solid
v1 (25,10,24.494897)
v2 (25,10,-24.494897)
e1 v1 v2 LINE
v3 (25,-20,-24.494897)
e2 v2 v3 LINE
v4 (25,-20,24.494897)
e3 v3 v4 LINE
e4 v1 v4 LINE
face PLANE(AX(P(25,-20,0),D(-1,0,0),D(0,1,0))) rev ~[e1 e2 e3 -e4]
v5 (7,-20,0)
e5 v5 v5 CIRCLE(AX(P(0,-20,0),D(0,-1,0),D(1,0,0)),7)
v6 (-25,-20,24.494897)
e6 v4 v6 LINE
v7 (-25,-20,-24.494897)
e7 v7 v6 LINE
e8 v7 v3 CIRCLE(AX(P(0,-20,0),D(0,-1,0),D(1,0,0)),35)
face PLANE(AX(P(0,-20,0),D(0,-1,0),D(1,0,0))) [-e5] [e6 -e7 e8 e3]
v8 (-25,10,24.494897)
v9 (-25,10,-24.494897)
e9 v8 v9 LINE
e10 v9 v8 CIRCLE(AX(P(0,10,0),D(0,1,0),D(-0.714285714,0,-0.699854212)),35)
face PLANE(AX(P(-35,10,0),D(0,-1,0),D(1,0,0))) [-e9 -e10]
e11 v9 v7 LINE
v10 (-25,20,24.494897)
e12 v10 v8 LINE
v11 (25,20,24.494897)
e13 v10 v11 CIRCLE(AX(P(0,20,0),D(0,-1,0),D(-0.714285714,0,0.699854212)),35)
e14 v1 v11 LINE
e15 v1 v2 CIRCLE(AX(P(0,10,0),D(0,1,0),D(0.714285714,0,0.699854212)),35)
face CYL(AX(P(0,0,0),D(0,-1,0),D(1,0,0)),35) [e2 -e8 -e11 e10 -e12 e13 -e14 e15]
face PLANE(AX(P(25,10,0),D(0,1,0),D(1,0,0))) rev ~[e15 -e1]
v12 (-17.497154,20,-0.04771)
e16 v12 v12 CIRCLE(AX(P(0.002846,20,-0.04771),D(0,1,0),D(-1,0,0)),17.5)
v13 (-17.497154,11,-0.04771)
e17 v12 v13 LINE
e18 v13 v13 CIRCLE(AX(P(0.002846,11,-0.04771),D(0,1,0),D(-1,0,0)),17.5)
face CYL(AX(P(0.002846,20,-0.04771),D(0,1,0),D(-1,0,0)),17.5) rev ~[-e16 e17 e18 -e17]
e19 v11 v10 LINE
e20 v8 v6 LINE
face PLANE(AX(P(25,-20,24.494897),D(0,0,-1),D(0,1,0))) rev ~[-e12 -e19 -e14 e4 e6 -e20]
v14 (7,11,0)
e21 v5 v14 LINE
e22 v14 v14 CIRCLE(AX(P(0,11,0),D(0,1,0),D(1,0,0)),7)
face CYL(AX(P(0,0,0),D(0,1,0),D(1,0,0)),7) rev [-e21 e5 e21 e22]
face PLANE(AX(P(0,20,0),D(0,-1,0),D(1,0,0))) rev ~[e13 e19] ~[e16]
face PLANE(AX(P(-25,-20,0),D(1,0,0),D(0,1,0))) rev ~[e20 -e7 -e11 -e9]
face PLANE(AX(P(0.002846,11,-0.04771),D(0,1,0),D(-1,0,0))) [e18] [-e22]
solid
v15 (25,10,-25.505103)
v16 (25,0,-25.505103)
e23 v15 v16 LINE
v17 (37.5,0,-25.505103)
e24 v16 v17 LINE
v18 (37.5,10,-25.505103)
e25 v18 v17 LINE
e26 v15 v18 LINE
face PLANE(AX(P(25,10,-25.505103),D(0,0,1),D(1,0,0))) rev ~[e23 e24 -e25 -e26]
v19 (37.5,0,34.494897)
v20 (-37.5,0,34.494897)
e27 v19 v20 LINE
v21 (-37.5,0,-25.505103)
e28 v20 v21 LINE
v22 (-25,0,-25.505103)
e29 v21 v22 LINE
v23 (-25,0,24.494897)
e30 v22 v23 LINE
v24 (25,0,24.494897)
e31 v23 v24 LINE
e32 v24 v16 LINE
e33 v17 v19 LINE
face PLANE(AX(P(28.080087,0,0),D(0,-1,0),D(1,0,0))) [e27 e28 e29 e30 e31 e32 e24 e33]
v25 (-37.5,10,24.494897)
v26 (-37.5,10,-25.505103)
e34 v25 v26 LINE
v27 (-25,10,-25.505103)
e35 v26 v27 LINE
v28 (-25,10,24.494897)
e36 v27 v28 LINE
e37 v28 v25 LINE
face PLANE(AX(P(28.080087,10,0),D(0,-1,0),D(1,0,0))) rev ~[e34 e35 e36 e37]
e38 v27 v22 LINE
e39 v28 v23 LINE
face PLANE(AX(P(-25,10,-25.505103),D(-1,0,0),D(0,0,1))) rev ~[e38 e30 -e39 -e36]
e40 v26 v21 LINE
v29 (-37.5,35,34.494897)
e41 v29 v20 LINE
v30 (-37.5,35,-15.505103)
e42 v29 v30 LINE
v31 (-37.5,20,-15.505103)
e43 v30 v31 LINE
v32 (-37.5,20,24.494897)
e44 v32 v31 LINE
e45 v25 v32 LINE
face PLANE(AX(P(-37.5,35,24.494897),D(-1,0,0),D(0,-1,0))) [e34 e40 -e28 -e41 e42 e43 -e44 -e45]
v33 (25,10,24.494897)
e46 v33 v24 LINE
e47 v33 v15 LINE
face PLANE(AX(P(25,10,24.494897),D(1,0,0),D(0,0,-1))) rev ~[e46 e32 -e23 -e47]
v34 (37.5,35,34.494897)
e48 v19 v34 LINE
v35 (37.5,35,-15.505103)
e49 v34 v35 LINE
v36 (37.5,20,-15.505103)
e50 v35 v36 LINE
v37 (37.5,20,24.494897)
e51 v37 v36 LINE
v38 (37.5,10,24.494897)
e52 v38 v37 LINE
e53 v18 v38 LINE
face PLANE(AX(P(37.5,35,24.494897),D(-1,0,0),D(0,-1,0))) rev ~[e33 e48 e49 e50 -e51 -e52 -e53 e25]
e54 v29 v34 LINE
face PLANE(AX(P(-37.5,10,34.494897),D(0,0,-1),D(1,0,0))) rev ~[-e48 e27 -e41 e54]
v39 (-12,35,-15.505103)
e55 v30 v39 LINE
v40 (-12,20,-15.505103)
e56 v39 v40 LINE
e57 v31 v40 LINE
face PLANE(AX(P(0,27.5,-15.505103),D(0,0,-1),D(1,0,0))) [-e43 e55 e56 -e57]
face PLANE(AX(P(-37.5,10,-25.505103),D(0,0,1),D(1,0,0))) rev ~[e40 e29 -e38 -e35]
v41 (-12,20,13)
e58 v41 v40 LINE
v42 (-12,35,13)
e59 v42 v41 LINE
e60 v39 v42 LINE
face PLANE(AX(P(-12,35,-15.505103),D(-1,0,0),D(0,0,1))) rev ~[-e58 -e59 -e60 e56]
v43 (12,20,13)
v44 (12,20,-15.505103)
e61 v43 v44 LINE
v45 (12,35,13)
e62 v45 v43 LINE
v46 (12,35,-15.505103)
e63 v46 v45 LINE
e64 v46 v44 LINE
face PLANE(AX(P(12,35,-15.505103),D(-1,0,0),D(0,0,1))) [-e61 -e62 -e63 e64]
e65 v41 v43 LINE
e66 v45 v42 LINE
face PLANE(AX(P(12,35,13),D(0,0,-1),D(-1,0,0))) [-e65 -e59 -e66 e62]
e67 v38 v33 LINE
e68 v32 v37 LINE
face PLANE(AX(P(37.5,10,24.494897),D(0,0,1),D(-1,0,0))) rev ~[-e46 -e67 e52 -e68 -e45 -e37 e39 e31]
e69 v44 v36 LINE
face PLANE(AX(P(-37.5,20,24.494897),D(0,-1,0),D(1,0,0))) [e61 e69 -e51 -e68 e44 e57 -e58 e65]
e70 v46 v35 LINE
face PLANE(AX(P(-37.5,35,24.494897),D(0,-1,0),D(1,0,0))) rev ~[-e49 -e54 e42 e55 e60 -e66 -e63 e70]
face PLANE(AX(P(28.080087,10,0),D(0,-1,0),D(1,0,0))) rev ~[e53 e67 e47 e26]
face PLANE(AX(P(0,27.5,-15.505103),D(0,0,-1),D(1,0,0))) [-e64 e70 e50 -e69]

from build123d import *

# Parameters (mm, degrees)
F0_R      = 35
F0_R_2    = 7
F1_DEPTH  = 20
F2_W      = 10
F2_H      = 30
F3_DEPTH  = 35
F5_DEPTH  = 70
F6_R      = 17.5
F6_R_2    = 7
F7_DEPTH  = 9
F9_DEPTH  = 10
F11_DEPTH = 25
F12_W     = 75
F12_H     = 15
F13_DEPTH = 40
F14_W     = 24
F14_H     = 28.5051025722
F15_DEPTH = 25


# Not quite as in the source:
# - a feature names something its author has since deleted; it is built from what else it names


with BuildPart() as f1:
    # F0 (on Front) → F1 (new body, symmetric)
    with BuildSketch(Plane.XZ):
        Circle(F0_R)
        Circle(F0_R_2, mode=Mode.SUBTRACT)
    extrude(amount=F1_DEPTH, both=True)

    # F2 (on Top) → F3 (cut, symmetric)
    with BuildSketch(Plane.XY):
        with Locations((30, -5)):
            Rectangle(F2_W, F2_H)
        with Locations((-30, -5)):
            Rectangle(F2_W, F2_H)
    extrude(amount=F3_DEPTH, both=True, mode=Mode.SUBTRACT)

    # F4 (on face) → F5 (cut)
    with BuildSketch(Plane.YZ.offset(25)):
        Polygon((-20, 35), (-20, 24.4948974278), (10, 24.4948974278), (20, 24.4948974278), (20, 35), align=None)
    extrude(amount=-F5_DEPTH, mode=Mode.SUBTRACT)

    # F6 (on face) → F7 (cut)
    with BuildSketch(Plane(origin=(0, 20, 0), x_dir=(-1, 0, 0), z_dir=(0, 1, 0))):
        with Locations((-0.0028463546, -0.0477097929)):
            Circle(F6_R)
        Circle(F6_R_2, mode=Mode.SUBTRACT)
    extrude(amount=-F7_DEPTH, mode=Mode.SUBTRACT)


with BuildPart() as f9:
    # F8 (on face) → F9 (new body)
    with BuildSketch(Plane.XZ.offset(-10)):
        with BuildLine():
            ThreePointArc((25, -24.4948974278), (35, 0), (25, 24.4948974278))
            Line((25, 24.4948974278), (25, -24.4948974278))
        make_face()
        with BuildLine():
            Line((-37.5, 34.4948974278), (-37.5, -25.5051025722))
            Line((-37.5, -25.5051025722), (-25, -25.5051025722))
            Line((-25, -25.5051025722), (-25, 24.4948974278))
            Line((-25, 24.4948974278), (25, 24.4948974278))
            ThreePointArc((25, 24.4948974278), (35, 0), (25, -24.4948974278))
            Line((25, -24.4948974278), (25, -25.5051025722))
            Line((25, -25.5051025722), (37.5, -25.5051025722))
            Line((37.5, -25.5051025722), (37.5, 34.4948974278))
            Line((37.5, 34.4948974278), (-37.5, 34.4948974278))
        make_face()
    extrude(amount=F9_DEPTH)

    # F10 (on face) → F11 (join)
    with BuildSketch(Plane(origin=(0, 10, 0), x_dir=(-1, 0, 0), z_dir=(0, 1, 0))):
        Polygon((37.5, 34.4948974278), (-37.5, 34.4948974278), (-37.5, 24.4948974278), (-25, 24.4948974278), (25, 24.4948974278), (37.5, 24.4948974278), align=None)
    extrude(amount=F11_DEPTH)

    # F12 (on face) → F13 (join)
    with BuildSketch(Plane(origin=(0, 0, 24.4948974278), x_dir=(1, 0, 0), z_dir=(0, 0, -1))):
        with Locations((0, -27.5)):
            Rectangle(F12_W, F12_H)
    extrude(amount=F13_DEPTH)

    # F14 (on face) → F15 (cut)
    with BuildSketch(Plane(origin=(0, 35, 0), x_dir=(-1, 0, 0), z_dir=(0, 1, 0))):
        with Locations((0, -1.2525512861)):
            Rectangle(F14_W, F14_H)
    extrude(amount=-F15_DEPTH, mode=Mode.SUBTRACT)


solid = Compound([f1.part, f9.part])
